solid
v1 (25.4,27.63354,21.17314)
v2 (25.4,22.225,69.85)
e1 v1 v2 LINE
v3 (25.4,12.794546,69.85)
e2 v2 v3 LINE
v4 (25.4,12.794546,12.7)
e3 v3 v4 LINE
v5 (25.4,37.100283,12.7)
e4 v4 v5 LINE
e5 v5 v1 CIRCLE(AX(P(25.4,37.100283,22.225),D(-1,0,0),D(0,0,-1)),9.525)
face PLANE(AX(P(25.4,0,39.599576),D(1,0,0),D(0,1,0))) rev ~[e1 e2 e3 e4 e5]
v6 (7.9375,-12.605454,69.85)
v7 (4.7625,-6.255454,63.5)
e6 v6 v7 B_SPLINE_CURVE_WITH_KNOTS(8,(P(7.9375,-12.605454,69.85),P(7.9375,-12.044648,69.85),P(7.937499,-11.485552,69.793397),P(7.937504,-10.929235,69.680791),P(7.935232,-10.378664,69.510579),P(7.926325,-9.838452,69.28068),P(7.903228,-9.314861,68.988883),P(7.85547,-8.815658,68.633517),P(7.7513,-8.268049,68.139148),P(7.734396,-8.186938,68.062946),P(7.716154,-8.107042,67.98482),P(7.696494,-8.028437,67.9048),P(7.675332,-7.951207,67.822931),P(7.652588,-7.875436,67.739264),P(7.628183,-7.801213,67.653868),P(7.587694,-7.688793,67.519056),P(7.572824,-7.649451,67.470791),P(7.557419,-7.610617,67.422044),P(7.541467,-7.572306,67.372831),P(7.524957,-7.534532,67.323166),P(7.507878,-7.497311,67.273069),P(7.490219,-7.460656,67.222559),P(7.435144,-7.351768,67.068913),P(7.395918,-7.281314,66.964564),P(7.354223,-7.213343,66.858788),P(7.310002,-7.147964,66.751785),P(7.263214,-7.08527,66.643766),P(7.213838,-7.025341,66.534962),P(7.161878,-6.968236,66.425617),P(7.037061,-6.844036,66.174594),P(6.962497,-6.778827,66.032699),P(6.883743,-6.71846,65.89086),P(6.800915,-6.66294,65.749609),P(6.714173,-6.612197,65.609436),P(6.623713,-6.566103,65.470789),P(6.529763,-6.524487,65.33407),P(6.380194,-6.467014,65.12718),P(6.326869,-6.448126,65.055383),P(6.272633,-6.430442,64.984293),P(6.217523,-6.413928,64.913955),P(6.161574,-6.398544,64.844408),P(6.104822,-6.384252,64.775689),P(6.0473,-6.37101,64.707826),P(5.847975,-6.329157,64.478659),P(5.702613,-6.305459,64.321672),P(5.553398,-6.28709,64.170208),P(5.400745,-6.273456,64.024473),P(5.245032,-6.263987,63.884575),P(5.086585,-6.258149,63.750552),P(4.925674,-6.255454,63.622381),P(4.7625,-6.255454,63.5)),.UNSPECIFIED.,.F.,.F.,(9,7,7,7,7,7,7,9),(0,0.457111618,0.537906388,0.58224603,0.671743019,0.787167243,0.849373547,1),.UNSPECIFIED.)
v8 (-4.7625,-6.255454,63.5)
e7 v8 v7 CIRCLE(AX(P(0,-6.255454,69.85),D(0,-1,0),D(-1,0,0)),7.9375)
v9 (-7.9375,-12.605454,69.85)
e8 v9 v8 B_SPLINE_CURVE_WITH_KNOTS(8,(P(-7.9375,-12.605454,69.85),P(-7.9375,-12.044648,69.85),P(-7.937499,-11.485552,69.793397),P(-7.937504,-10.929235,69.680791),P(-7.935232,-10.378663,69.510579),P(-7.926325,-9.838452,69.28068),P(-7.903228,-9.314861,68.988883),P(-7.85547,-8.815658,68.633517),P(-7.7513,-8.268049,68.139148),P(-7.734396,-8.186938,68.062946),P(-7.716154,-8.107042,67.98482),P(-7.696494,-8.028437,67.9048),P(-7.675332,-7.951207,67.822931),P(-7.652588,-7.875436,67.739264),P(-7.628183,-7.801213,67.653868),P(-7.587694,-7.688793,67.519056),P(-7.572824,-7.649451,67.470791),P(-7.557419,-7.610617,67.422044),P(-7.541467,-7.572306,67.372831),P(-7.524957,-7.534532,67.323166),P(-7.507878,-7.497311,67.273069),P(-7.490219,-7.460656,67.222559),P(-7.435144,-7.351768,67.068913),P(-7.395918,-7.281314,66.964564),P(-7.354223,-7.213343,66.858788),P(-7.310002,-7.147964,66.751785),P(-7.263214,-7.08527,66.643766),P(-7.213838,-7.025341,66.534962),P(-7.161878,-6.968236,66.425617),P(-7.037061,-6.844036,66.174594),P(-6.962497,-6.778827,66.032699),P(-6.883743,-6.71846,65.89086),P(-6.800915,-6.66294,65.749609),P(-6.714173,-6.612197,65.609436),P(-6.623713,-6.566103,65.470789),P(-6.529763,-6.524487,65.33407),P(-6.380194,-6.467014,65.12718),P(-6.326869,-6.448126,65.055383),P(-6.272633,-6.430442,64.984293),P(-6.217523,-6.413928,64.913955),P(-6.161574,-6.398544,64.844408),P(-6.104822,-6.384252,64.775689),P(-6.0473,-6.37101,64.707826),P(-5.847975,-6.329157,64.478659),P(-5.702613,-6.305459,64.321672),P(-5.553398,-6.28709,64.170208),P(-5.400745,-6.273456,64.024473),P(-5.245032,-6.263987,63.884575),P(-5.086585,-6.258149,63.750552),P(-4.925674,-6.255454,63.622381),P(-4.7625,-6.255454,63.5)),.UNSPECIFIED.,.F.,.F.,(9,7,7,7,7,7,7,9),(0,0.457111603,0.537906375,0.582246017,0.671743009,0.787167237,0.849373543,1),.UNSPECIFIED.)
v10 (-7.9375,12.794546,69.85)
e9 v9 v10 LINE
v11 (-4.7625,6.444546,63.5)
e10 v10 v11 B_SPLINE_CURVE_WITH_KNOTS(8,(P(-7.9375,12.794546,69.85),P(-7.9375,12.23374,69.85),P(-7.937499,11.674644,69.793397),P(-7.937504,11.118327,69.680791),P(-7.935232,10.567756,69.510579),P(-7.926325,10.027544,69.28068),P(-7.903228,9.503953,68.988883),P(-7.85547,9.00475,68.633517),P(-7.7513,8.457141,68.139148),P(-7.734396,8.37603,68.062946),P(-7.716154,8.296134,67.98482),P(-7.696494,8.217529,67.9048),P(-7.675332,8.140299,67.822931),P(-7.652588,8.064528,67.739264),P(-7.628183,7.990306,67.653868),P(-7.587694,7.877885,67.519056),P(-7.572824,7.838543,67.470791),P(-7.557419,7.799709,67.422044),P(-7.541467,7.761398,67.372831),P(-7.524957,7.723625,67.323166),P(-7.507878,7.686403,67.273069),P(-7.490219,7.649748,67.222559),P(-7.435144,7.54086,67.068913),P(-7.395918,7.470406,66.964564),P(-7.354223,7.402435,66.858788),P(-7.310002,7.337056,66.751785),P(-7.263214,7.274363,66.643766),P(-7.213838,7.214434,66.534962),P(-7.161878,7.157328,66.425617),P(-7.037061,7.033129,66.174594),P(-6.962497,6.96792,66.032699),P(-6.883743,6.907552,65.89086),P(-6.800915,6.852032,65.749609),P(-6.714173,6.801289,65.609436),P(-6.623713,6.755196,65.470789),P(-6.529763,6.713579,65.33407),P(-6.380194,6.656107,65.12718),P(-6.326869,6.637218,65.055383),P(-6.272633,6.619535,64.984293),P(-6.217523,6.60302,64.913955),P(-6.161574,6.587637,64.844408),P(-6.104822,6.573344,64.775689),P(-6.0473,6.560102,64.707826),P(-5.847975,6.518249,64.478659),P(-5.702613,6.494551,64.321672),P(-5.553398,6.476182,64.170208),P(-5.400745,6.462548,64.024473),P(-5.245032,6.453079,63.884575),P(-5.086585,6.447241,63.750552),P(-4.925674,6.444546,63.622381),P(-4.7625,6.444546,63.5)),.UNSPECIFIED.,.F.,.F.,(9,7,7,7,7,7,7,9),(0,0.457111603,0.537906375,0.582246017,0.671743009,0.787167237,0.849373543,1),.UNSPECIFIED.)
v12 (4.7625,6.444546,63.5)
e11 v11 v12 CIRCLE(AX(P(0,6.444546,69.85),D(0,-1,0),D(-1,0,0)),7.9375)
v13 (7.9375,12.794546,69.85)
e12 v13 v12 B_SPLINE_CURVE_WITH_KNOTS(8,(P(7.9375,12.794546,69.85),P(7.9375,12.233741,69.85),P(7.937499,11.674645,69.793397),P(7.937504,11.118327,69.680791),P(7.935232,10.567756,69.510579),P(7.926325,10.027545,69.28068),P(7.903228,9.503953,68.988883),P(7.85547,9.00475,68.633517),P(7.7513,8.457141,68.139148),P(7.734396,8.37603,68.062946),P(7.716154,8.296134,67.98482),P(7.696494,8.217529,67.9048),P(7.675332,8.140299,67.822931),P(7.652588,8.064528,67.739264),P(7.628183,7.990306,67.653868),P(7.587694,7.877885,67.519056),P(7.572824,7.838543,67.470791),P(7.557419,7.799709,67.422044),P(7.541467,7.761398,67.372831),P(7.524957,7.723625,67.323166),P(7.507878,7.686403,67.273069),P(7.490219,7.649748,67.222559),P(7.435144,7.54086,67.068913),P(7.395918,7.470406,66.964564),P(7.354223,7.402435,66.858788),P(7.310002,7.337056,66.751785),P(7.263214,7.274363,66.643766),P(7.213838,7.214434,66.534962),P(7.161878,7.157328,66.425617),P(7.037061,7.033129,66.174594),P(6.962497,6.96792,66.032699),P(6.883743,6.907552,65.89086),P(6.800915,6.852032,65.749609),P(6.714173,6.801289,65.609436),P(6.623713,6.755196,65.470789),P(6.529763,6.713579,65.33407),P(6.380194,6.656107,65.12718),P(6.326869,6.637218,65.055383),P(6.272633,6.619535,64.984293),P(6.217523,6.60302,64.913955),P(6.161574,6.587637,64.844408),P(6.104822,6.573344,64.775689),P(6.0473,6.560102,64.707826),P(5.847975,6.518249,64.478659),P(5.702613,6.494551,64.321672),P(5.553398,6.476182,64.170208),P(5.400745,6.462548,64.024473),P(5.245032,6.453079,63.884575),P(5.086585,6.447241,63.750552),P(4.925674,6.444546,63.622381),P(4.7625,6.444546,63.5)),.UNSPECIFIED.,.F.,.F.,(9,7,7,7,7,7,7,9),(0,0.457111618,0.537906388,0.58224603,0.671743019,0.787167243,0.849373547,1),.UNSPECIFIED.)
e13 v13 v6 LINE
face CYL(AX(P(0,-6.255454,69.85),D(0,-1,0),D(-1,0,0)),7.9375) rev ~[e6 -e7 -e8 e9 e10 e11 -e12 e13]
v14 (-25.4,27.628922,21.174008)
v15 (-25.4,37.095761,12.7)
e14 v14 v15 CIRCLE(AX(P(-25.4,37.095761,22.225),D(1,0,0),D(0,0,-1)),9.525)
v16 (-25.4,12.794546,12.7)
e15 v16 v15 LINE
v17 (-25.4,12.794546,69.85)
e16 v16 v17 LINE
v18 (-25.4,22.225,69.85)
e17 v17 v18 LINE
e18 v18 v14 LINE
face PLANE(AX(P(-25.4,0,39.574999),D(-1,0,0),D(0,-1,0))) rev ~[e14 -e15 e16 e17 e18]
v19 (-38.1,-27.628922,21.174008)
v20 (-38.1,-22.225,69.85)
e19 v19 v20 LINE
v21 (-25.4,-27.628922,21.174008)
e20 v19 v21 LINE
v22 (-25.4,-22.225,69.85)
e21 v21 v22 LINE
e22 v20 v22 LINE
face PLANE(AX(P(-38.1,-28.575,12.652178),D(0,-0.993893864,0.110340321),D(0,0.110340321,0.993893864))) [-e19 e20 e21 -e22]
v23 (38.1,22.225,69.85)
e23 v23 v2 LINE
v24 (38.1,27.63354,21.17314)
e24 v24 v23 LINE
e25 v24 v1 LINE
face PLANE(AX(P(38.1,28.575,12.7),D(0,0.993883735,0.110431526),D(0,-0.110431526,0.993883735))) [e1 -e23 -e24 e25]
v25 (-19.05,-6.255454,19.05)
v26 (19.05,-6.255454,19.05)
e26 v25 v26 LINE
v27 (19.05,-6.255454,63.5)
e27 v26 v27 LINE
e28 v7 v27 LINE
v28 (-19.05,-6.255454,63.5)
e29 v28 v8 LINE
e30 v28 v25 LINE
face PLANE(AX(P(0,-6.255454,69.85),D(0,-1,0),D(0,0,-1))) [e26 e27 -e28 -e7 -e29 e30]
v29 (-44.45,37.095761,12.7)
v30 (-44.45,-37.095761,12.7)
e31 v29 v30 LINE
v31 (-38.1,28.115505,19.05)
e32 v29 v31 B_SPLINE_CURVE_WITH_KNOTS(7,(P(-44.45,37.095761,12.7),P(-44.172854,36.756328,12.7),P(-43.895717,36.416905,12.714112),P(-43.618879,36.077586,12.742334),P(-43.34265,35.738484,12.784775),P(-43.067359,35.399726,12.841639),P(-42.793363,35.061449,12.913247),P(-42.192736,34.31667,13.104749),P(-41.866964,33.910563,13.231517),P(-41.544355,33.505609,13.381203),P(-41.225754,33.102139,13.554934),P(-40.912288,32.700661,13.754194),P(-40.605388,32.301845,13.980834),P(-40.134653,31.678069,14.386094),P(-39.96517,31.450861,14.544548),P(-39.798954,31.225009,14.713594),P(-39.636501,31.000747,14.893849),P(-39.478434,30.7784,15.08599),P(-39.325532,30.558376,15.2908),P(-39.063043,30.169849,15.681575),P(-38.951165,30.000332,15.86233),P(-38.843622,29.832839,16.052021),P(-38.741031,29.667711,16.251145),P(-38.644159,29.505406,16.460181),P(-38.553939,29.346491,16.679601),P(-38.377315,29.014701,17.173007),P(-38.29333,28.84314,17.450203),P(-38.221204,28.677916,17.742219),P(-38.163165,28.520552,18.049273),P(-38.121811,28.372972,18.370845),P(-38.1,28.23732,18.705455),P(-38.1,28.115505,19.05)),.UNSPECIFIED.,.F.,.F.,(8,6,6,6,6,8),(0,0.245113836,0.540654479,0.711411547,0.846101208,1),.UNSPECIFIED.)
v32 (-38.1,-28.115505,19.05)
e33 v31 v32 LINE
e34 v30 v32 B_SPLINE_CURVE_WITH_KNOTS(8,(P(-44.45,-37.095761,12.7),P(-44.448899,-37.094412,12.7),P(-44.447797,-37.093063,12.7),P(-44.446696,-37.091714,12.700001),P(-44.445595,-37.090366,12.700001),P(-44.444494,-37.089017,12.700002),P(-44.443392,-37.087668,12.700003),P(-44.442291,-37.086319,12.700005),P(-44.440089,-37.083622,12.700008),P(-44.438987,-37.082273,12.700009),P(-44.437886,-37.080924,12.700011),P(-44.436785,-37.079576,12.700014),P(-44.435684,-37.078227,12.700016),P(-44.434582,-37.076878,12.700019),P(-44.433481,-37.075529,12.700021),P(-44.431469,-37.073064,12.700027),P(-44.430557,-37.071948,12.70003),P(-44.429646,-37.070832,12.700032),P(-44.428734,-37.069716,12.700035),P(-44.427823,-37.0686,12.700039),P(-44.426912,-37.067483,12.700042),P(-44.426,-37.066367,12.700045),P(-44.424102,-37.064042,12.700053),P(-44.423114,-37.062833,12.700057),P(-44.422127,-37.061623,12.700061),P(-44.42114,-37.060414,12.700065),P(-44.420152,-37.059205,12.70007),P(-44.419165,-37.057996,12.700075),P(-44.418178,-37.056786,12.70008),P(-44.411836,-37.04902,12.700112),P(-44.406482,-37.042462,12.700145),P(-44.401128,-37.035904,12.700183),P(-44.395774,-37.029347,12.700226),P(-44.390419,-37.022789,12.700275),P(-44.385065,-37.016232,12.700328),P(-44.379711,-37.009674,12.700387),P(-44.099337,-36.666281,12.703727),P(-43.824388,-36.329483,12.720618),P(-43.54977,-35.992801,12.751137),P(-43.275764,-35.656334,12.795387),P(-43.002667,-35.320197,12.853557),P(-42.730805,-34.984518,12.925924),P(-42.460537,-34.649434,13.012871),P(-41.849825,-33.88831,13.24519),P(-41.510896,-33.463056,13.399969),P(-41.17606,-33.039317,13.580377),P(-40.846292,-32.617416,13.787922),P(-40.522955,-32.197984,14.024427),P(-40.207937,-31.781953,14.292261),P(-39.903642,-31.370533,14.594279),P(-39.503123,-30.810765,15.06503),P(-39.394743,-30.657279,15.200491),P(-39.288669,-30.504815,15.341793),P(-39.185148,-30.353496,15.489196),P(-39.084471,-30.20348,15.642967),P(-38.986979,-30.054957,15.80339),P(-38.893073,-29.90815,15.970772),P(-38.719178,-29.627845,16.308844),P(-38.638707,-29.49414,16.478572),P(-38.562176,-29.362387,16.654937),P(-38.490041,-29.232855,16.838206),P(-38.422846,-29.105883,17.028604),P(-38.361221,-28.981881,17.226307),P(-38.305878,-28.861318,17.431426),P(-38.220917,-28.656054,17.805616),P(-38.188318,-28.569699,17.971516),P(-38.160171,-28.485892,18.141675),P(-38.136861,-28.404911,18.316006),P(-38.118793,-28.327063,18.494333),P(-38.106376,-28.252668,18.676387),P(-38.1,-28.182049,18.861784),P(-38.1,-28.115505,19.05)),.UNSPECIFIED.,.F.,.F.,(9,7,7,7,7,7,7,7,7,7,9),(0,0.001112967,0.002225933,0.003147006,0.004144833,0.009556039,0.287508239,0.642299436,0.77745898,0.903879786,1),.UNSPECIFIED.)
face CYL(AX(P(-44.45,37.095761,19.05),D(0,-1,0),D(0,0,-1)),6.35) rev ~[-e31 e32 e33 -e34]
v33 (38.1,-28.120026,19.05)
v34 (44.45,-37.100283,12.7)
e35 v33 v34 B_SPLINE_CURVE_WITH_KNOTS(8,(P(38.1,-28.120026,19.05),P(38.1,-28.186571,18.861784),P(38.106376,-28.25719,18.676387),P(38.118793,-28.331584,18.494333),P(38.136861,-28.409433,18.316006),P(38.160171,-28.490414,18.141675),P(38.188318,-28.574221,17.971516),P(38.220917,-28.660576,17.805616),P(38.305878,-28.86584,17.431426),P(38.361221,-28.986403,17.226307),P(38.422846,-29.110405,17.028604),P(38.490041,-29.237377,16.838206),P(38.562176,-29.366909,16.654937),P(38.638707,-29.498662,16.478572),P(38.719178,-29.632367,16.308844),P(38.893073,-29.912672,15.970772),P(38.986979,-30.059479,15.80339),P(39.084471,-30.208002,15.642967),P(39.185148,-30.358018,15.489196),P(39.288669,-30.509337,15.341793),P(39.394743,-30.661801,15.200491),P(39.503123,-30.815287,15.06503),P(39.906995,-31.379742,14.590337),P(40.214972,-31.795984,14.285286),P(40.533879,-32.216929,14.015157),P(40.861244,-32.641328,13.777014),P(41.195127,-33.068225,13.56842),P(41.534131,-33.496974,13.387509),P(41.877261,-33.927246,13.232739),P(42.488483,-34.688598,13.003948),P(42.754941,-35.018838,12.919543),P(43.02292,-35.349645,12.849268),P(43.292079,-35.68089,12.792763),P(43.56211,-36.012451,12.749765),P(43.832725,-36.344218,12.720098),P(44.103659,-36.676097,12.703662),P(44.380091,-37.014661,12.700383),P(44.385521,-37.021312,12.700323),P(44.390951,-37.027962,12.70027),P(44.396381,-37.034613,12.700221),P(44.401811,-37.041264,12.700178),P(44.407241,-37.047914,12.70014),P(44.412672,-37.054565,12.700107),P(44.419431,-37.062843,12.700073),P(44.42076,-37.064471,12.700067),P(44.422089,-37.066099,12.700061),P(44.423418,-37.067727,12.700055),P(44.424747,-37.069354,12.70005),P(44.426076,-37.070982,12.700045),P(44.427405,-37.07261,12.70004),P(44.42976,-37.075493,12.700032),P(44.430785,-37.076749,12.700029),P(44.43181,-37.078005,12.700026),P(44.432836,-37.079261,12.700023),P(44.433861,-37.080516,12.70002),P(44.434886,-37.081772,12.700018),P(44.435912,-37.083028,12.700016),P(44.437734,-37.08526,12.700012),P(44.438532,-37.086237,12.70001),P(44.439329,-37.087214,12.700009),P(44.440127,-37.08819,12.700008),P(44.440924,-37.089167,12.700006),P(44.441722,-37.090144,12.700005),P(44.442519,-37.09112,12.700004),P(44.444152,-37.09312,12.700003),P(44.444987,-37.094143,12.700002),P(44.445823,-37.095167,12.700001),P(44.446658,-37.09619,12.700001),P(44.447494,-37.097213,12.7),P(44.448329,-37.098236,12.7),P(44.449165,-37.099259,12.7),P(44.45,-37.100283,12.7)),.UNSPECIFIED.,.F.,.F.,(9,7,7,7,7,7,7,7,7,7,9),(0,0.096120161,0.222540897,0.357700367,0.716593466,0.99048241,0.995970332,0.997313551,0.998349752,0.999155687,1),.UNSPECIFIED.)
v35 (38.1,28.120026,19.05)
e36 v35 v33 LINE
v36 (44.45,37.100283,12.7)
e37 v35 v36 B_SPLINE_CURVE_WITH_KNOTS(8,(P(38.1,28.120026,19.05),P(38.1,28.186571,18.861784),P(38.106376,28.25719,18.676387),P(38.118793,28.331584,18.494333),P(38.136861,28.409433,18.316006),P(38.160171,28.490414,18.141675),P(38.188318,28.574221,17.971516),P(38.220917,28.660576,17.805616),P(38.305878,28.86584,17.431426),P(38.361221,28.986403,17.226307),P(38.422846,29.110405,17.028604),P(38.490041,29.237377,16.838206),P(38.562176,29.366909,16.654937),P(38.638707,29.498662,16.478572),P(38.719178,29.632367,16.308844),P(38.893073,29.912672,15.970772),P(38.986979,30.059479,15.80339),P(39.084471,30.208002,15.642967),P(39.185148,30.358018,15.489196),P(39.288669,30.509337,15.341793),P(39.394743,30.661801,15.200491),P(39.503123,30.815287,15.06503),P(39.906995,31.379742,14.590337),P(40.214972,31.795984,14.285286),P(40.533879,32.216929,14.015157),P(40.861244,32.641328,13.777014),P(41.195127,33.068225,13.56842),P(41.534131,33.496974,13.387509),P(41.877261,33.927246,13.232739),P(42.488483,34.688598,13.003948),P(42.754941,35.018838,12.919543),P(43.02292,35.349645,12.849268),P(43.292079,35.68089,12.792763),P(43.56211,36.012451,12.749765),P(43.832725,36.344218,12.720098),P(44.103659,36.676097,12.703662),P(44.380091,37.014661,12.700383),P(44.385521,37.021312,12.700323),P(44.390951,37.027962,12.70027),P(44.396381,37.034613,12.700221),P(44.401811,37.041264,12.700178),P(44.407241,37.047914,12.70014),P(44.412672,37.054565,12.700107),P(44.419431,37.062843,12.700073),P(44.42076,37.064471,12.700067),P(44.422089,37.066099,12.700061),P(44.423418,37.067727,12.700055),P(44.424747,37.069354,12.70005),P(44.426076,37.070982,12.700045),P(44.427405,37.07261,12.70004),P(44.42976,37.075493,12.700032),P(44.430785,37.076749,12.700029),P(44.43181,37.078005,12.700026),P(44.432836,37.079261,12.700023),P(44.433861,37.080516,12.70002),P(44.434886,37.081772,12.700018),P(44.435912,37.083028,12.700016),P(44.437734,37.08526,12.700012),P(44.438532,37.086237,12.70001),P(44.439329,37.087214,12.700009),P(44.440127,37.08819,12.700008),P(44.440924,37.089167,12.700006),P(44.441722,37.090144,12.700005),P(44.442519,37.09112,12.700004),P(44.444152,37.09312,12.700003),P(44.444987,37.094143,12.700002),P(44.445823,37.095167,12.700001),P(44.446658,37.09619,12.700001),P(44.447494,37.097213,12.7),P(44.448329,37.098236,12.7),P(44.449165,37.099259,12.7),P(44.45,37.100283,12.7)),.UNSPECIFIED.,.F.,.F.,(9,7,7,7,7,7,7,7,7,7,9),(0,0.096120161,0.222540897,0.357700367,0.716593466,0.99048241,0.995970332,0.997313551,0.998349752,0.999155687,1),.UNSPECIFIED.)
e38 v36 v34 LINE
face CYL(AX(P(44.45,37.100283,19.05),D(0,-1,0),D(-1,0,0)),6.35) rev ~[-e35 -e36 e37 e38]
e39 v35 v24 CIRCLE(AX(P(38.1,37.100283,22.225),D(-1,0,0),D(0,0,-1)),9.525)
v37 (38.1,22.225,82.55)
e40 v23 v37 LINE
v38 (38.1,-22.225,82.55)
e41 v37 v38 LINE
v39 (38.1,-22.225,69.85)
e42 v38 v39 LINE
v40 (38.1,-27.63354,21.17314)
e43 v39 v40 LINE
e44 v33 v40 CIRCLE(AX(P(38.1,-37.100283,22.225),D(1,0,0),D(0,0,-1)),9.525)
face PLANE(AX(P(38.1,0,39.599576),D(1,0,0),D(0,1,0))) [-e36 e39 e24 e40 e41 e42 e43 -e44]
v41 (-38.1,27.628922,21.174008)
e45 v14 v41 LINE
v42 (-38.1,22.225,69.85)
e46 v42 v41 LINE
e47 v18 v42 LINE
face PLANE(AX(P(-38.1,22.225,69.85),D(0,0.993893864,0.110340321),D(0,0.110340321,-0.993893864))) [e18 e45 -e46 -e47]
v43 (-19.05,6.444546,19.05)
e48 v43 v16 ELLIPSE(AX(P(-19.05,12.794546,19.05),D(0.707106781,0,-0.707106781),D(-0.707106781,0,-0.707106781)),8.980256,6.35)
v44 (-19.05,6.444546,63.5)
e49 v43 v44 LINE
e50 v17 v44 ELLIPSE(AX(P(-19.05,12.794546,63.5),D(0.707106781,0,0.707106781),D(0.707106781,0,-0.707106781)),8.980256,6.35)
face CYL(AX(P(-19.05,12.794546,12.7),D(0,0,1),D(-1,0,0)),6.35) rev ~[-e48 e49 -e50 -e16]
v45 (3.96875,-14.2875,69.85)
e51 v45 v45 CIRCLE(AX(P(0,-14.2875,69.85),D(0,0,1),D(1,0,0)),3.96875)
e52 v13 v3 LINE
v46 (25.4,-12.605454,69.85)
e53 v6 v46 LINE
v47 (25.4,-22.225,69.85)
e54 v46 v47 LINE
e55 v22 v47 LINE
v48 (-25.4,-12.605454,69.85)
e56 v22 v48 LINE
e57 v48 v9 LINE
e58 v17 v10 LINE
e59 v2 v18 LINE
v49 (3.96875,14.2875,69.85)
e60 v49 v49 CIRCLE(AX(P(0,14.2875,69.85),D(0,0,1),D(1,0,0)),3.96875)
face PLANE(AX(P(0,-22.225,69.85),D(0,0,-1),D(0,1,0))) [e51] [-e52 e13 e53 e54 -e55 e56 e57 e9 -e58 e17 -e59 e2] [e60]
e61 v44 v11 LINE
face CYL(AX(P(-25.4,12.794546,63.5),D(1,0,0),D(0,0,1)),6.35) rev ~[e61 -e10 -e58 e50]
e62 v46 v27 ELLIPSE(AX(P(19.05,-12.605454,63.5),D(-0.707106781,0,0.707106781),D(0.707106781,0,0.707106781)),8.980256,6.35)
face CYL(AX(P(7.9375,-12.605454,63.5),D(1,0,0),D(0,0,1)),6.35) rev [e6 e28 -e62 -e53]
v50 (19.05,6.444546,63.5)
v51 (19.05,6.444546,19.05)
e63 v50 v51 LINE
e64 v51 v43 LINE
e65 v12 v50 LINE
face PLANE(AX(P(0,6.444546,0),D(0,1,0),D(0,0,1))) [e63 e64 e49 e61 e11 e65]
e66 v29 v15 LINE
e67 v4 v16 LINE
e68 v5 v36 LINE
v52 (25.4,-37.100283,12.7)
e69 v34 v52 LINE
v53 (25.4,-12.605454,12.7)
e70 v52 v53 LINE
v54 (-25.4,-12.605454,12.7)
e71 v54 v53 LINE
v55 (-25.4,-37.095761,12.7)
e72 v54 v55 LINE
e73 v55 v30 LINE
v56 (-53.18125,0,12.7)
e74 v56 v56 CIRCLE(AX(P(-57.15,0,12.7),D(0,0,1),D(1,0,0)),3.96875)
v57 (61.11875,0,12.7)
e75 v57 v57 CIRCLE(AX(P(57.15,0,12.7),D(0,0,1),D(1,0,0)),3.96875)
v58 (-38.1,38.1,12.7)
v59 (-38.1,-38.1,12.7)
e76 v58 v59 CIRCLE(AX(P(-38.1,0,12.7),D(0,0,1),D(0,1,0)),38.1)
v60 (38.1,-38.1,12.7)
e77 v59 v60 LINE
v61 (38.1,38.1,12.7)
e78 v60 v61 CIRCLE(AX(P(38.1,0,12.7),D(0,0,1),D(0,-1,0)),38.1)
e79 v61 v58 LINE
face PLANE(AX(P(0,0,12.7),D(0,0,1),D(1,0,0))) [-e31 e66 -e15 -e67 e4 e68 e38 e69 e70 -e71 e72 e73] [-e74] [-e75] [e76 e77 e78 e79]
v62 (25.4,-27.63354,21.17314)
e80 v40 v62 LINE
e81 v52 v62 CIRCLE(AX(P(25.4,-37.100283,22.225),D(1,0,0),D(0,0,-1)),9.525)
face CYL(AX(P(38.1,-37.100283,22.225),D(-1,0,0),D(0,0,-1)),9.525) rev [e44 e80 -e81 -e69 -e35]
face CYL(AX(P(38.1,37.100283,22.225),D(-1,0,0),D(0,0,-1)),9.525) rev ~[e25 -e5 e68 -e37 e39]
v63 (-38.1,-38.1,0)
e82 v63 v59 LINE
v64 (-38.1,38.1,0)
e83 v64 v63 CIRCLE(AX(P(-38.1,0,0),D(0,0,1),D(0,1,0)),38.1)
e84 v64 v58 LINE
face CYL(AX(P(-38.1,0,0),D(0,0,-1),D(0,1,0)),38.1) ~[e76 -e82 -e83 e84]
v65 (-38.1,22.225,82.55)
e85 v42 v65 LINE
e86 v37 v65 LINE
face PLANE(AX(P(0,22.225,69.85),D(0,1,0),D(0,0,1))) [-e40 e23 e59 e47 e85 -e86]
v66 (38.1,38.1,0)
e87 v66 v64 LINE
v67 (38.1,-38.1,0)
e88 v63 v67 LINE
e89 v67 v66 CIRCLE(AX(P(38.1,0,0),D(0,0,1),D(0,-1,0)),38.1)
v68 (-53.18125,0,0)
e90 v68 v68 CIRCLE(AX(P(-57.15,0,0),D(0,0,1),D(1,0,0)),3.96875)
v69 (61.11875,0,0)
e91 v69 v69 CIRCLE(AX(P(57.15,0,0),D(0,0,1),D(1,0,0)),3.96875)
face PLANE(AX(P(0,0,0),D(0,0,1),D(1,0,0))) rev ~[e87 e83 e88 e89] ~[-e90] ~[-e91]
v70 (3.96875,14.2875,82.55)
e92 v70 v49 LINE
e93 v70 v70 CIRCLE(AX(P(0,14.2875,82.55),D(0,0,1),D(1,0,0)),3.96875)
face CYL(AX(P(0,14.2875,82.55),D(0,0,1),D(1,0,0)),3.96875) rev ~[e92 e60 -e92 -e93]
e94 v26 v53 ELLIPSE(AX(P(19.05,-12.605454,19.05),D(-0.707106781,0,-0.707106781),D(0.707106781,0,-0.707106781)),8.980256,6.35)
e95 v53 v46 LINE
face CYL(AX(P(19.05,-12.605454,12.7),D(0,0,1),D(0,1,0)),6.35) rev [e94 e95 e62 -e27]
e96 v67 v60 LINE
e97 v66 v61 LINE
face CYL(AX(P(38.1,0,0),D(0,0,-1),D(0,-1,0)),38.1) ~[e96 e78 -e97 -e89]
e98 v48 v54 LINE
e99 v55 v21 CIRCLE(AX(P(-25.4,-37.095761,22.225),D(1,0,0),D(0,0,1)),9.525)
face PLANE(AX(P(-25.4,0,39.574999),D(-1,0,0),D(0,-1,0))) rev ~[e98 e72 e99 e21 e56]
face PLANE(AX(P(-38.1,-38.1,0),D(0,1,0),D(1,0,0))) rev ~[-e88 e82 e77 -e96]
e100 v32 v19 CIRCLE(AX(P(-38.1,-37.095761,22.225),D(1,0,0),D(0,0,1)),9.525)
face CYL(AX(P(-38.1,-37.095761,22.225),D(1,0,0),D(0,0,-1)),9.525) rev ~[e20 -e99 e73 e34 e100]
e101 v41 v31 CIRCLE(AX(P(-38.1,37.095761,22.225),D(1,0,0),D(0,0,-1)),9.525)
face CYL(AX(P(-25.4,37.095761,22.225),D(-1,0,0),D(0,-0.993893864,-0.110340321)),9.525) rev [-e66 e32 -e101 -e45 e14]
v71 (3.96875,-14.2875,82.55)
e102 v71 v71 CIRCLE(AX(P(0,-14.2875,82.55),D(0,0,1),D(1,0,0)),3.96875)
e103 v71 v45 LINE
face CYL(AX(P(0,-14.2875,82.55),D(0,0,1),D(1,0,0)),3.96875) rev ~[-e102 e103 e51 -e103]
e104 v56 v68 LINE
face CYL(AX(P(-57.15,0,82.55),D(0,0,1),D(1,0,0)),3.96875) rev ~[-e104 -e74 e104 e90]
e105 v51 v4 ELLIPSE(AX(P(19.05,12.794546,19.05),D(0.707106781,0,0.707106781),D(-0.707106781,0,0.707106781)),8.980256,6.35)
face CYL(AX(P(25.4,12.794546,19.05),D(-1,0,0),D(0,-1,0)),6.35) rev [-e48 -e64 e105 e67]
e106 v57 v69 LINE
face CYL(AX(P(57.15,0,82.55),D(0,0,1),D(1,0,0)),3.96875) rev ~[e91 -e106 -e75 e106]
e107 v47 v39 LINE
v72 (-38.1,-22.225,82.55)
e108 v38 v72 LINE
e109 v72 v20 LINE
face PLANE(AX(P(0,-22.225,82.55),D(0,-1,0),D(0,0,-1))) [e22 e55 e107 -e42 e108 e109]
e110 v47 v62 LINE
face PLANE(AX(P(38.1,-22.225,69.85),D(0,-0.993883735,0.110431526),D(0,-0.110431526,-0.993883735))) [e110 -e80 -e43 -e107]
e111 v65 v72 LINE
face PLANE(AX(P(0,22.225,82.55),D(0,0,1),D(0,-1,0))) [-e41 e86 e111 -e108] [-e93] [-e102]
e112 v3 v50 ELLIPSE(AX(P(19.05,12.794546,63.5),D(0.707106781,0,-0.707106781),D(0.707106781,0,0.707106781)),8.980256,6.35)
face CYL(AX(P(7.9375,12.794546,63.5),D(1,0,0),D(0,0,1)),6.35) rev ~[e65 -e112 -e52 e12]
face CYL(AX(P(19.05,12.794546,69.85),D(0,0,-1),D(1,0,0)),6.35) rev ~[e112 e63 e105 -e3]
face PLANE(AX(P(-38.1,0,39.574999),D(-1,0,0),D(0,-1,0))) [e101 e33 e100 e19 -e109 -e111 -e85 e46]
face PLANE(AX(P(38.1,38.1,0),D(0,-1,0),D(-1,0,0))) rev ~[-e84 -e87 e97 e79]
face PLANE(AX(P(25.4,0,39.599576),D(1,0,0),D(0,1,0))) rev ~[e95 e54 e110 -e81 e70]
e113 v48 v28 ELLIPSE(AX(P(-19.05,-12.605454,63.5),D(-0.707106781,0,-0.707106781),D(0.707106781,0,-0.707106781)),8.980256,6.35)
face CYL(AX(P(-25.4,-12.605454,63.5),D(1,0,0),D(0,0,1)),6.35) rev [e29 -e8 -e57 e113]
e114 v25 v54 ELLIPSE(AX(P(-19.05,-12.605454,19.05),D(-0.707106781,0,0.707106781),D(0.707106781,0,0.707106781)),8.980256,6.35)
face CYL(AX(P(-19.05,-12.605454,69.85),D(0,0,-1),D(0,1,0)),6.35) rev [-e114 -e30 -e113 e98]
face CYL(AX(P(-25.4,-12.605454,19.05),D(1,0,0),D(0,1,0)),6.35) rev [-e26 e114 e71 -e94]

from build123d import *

# Parameters (mm, degrees)
F1_DEPTH  = 12.7
F3_DEPTH  = 38.1
F5_DEPTH  = 25.4
F7_DEPTH  = 12.7
F9_DEPTH  = 12.7
F10_R     = 3.96875
F11_DEPTH = 25.4
F12_DEPTH = 82.551
F13_R     = 9.525
F14_R     = 6.35


# Not quite as in the source:
# - a length typed as a fraction of an inch, garbled in the dataset ("3 / 203.2 mm" for 3/8 in), is restored


with BuildPart() as f1:
    # F0 (on Top) → F1 (new body)
    with BuildSketch(Plane.XY):
        with BuildLine():
            Line((-38.1, -38.1), (38.1, -38.1))
            ThreePointArc((38.1, -38.1), (76.2, 0), (38.1, 38.1))
            Line((38.1, 38.1), (-38.1, 38.1))
            ThreePointArc((-38.1, 38.1), (-76.2, 0), (-38.1, -38.1))
        make_face()
    extrude(amount=F1_DEPTH)

    # F2 (on Right) → F3 (join, symmetric)
    with BuildSketch(Plane.YZ):
        Polygon((6.4445460903, 82.55), (0, 82.55), (-6.2554539097, 82.55), (-22.225, 82.55), (-22.225, 69.85), (-6.2554539097, 69.85), (-6.2554539097, 0), (6.4445460903, 0), (6.4445460903, 69.85), (22.225, 69.85), (22.225, 82.55), align=None)
    extrude(amount=F3_DEPTH, both=True)

    # F4 (on face) → F5 (cut)
    with BuildSketch(Plane.XZ.offset(6.2554539097)):
        with BuildLine():
            Line((7.9375, 69.85), (-7.9375, 69.85))
            ThreePointArc((-7.9375, 69.85), (0, 61.9125), (7.9375, 69.85))
        make_face()
    extrude(amount=-F5_DEPTH, mode=Mode.SUBTRACT)

    # F6 (on face) → F7 (join)
    with BuildSketch(Plane.YZ.offset(38.1)):
        Polygon((-28.575, 12.7), (28.575, 12.7), (22.225, 69.85), (-22.225, 69.85), align=None)
    extrude(amount=-F7_DEPTH)

    # F8 (on face) → F9 (join)
    with BuildSketch(Plane(origin=(-38.1, 0, 0), x_dir=(0, -1, 0), z_dir=(-1, 0, 0))):
        Polygon((-22.225, 69.85), (-28.575, 12.6521781883), (28.575, 12.6521781883), (22.225, 69.85), align=None)
    extrude(amount=-F9_DEPTH)

    # F10 (on face) → F11 (cut)
    with BuildSketch(Plane.XY.offset(82.55)):
        with Locations((0, 14.2875)):
            Circle(F10_R)
        with Locations((0, -14.2875)):
            Circle(F10_R)
    extrude(amount=-F11_DEPTH, mode=Mode.SUBTRACT)

    # F10 (on face) → F12 (cut, through all)
    with BuildSketch(Plane.XY.offset(82.55)):
        with Locations((-57.15, 0)):
            Circle(F10_R)
        with Locations((57.15, 0)):
            Circle(F10_R)
    extrude(amount=-F12_DEPTH, mode=Mode.SUBTRACT)

    # F13
    f13_edges = [f1.edges().sort_by_distance(p)[0] for p in [
        (31.75, -28.575, 12.7),
        (31.75, 28.575, 12.7),
        (-31.75, -28.569691, 12.7),
        (-31.75, 28.569691, 12.7),
    ]]
    fillet(f13_edges, radius=F13_R)

    # F14
    f14_edges = [f1.edges().sort_by_distance(p)[0] for p in [
        (0, 6.444546, 12.7),
        (0, -6.255454, 12.7),
        (-16.66875, -6.255454, 69.85),
        (16.66875, -6.255454, 69.85),
        (-16.66875, 6.444546, 69.85),
        (16.66875, 6.444546, 69.85),
        (38.1, 0, 12.7),
        (-38.1, 0, 12.7),
        (-25.4, 6.444546, 41.275),
        (25.4, 6.444546, 41.275),
        (-25.4, -6.255454, 41.275),
        (25.4, -6.255454, 41.275),
    ]]
    fillet(f14_edges, radius=F14_R)


solid = f1.part
